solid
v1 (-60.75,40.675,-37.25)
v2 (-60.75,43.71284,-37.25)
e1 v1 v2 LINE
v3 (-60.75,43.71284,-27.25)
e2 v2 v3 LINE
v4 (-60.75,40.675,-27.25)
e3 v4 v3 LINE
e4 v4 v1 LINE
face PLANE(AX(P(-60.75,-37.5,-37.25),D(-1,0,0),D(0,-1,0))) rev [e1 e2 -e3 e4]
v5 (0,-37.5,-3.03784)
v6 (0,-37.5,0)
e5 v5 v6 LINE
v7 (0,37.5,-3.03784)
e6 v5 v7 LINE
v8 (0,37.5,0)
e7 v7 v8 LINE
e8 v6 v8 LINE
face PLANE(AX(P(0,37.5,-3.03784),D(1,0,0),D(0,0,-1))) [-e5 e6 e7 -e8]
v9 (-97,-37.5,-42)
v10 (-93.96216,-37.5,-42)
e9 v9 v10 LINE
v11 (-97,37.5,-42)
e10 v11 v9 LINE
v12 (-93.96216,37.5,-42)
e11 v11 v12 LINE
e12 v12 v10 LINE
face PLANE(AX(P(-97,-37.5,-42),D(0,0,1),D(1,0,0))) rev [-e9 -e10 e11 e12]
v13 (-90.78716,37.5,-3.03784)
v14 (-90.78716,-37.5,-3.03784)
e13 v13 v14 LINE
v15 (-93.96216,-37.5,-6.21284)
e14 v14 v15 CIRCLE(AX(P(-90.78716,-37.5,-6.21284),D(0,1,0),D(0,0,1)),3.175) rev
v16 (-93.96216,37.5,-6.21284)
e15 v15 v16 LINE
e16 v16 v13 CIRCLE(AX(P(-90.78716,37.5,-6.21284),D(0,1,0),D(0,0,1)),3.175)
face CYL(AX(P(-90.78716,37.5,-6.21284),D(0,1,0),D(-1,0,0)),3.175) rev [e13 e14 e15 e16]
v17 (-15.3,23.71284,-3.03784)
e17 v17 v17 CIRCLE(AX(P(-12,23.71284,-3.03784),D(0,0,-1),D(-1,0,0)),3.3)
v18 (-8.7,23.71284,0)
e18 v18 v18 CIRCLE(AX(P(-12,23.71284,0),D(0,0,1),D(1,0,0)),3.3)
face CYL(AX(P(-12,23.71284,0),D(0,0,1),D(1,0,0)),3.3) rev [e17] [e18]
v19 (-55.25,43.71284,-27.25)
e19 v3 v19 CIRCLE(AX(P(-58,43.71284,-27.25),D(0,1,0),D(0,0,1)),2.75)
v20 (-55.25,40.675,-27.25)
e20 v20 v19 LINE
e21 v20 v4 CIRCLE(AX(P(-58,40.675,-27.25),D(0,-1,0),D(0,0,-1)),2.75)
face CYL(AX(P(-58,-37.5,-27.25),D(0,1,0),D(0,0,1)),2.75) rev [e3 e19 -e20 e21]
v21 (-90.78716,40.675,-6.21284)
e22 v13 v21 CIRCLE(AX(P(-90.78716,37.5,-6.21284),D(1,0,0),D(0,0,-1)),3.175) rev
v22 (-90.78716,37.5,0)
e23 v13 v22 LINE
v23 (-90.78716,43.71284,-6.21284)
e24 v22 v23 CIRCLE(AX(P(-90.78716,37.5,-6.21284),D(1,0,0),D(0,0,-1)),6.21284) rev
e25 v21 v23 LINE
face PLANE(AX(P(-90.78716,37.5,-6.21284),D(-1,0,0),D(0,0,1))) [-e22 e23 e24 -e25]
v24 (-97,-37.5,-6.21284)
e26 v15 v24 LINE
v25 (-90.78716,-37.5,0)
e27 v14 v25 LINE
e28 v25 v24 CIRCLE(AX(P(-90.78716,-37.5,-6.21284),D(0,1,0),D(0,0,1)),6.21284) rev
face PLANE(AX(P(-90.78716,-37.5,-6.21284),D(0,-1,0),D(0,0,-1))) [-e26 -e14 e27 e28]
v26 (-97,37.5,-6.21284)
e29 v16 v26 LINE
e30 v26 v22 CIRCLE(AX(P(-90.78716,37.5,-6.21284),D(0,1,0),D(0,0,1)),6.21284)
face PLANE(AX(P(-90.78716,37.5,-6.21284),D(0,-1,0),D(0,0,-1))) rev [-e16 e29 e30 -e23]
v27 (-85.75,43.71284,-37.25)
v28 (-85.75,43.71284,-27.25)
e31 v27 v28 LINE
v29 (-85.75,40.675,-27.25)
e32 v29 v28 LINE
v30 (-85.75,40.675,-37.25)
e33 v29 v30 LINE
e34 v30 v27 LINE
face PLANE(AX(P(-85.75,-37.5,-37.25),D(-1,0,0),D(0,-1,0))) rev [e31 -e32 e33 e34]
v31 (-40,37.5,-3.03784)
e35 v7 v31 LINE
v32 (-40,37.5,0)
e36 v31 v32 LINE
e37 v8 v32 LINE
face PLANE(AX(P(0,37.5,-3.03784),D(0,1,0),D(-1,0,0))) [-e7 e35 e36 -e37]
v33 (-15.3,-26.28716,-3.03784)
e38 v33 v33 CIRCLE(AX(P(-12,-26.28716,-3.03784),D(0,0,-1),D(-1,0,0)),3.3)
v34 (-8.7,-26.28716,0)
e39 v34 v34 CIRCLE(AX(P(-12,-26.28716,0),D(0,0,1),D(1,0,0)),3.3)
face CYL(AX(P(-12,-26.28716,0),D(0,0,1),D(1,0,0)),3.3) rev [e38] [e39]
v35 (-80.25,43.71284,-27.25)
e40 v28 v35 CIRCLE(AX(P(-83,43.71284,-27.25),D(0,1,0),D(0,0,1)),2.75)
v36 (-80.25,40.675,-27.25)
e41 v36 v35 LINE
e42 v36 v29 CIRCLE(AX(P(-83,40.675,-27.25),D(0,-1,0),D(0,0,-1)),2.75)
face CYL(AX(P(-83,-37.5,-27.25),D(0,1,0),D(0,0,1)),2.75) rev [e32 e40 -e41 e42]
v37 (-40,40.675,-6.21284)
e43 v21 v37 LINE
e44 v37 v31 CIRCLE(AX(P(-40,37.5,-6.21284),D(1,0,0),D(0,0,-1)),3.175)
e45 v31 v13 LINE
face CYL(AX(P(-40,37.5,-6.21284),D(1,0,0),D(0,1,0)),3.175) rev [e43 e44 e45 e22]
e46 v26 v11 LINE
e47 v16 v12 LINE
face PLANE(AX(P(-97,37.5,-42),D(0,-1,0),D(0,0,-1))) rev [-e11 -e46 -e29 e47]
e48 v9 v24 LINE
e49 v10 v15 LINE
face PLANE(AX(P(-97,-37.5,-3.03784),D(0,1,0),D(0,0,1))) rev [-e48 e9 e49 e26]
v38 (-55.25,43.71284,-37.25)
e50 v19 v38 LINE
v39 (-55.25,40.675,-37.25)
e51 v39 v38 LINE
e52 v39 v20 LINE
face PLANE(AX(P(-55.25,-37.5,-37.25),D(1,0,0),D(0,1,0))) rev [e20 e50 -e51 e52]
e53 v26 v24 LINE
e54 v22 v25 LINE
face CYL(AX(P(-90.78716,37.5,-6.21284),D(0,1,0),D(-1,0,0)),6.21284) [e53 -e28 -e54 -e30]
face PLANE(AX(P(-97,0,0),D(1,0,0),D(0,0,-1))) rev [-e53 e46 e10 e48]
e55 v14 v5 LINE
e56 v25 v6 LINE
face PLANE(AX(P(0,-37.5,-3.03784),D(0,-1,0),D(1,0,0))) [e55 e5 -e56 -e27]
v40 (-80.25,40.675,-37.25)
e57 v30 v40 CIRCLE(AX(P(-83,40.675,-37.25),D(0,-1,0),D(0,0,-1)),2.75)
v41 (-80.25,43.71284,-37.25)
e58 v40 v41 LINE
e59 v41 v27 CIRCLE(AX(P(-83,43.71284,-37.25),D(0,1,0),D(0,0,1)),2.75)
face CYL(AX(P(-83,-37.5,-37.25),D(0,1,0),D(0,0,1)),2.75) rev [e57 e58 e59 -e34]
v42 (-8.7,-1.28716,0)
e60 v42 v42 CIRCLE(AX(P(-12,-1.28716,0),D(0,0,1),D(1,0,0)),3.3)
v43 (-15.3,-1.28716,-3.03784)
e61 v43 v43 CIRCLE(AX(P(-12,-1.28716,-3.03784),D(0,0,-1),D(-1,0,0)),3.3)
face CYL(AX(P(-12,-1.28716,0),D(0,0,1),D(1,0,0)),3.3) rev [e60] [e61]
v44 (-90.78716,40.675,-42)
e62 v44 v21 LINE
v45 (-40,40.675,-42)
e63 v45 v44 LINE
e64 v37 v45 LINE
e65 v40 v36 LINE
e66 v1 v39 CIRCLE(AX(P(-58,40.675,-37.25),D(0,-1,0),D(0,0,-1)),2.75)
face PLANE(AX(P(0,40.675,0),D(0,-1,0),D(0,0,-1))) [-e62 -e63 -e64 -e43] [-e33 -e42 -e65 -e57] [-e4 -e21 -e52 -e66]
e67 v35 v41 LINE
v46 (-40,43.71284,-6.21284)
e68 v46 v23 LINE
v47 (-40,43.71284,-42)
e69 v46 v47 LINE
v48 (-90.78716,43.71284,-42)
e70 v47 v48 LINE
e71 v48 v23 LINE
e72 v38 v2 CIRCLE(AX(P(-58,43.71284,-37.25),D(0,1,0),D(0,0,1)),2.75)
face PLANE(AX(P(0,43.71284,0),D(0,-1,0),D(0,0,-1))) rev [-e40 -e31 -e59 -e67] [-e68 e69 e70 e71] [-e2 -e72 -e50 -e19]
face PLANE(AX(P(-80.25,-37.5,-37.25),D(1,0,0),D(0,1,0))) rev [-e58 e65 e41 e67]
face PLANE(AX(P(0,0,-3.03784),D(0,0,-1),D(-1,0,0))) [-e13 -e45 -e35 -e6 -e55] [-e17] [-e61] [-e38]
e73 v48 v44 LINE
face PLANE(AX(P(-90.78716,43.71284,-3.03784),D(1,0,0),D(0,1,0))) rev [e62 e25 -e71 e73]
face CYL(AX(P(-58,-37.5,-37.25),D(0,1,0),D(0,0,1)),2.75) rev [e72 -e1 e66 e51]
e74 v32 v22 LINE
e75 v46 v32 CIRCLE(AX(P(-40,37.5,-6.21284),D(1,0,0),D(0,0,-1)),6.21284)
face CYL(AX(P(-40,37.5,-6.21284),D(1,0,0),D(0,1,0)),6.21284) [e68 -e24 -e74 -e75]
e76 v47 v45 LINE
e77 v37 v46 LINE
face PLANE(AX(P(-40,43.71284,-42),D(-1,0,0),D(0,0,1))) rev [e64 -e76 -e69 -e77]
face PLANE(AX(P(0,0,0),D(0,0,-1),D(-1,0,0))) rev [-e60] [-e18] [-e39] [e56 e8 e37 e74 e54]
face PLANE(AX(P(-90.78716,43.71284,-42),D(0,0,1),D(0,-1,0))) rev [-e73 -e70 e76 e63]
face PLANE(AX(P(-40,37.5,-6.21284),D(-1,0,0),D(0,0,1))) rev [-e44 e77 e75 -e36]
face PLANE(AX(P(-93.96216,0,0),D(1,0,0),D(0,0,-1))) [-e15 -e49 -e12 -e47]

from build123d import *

# Parameters (mm, degrees)
SKETCH1_W                    = 97
SKETCH1_H                    = 75
BASE_FLANGE1_DEPTH           = 3.03784
EDGE_FLANGE1_STRIP_W         = 18.50136
EDGE_FLANGE1_STRIP_H         = 3.03784
EDGE_FLANGE1_STRIP_CUT_DEPTH = 75
EDGE_FLANGE1_DEPTH           = 75
EDGE_FLANGE2_DEPTH           = 50.78716
CUT_EXTRUDE3_DEPTH           = 134.298632329
M6_CLEARANCE_HOLE1_D         = 6.6


# Sheet-metal steps are written as plain solids
with BuildPart() as part:
    # Sketch1 → Base-Flange1 (new body)
    with BuildSketch(Plane.XY):
        with Locations((-48.5, 0)):
            Rectangle(SKETCH1_W, SKETCH1_H)
    extrude(amount=-BASE_FLANGE1_DEPTH)

    # Edge-Flange1 strip (across the edge) → Edge-Flange1 strip cut (cut)
    with BuildSketch(Plane(origin=(-97, -37.5, -3.03784), x_dir=(1, 0, 0), z_dir=(0, 1, 0))):
        with Locations((-3.03784, -1.51892)):
            Rectangle(EDGE_FLANGE1_STRIP_W, EDGE_FLANGE1_STRIP_H)
    extrude(amount=EDGE_FLANGE1_STRIP_CUT_DEPTH, mode=Mode.SUBTRACT)

    # Edge-Flange1 section (across the edge) → Edge-Flange1 (add)
    with BuildSketch(Plane(origin=(-97, -37.5, -3.03784), x_dir=(1, 0, 0), z_dir=(0, 1, 0))):
        with BuildLine():
            Line((0, 3.175), (0, 38.96216))
            Line((0, 38.96216), (3.03784, 38.96216))
            Line((3.03784, 38.96216), (3.03784, 3.175))
            ThreePointArc((3.03784, 3.175), (3.96777597, 0.92993597), (6.21284, 0))
            Line((6.21284, 0), (6.21284, -3.03784))
            ThreePointArc((6.21284, -3.03784), (1.819698706, -1.218141294), (0, 3.175))
        make_face()
    extrude(amount=EDGE_FLANGE1_DEPTH)

    # Edge-Flange2 section (across the edge) → Edge-Flange2 (add)
    with BuildSketch(Plane(origin=(-90.78716, 40.675, -3.03784), x_dir=(0, -1, 0), z_dir=(1, 0, 0))):
        with BuildLine():
            Line((-3.03784, 3.175), (-3.03784, 38.96216))
            Line((-3.03784, 38.96216), (0, 38.96216))
            Line((0, 38.96216), (0, 3.175))
            ThreePointArc((0, 3.175), (0.92993597, 0.92993597), (3.175, 0))
            Line((3.175, 0), (3.175, -3.03784))
            ThreePointArc((3.175, -3.03784), (-1.218141294, -1.218141294), (-3.03784, 3.175))
        make_face()
    extrude(amount=EDGE_FLANGE2_DEPTH)

    # Sketch13 → Cut-Extrude3 (cut, through all)
    with BuildSketch(Plane(origin=(0, 43.71284, 0), x_dir=(1, 0, 0), z_dir=(0, 1, 0))):
        with BuildLine():
            Line((-80.25, 37.25), (-80.25, 27.25))
            ThreePointArc((-80.25, 27.25), (-83, 24.5), (-85.75, 27.25))
            Line((-85.75, 27.25), (-85.75, 37.25))
            ThreePointArc((-85.75, 37.25), (-83, 40), (-80.25, 37.25))
        make_face()
        with BuildLine():
            Line((-55.25, 37.25), (-55.25, 27.25))
            ThreePointArc((-55.25, 27.25), (-58, 24.5), (-60.75, 27.25))
            Line((-60.75, 27.25), (-60.75, 37.25))
            ThreePointArc((-60.75, 37.25), (-58, 40), (-55.25, 37.25))
        make_face()
    extrude(amount=-CUT_EXTRUDE3_DEPTH, mode=Mode.SUBTRACT)

    # M6 Clearance Hole1 (through all)
    with Locations(Plane.XY):
        with Locations((-12, 23.71284), (-12, -26.28716), (-12, -1.28716)):
            Hole(M6_CLEARANCE_HOLE1_D / 2)


solid = part.part
